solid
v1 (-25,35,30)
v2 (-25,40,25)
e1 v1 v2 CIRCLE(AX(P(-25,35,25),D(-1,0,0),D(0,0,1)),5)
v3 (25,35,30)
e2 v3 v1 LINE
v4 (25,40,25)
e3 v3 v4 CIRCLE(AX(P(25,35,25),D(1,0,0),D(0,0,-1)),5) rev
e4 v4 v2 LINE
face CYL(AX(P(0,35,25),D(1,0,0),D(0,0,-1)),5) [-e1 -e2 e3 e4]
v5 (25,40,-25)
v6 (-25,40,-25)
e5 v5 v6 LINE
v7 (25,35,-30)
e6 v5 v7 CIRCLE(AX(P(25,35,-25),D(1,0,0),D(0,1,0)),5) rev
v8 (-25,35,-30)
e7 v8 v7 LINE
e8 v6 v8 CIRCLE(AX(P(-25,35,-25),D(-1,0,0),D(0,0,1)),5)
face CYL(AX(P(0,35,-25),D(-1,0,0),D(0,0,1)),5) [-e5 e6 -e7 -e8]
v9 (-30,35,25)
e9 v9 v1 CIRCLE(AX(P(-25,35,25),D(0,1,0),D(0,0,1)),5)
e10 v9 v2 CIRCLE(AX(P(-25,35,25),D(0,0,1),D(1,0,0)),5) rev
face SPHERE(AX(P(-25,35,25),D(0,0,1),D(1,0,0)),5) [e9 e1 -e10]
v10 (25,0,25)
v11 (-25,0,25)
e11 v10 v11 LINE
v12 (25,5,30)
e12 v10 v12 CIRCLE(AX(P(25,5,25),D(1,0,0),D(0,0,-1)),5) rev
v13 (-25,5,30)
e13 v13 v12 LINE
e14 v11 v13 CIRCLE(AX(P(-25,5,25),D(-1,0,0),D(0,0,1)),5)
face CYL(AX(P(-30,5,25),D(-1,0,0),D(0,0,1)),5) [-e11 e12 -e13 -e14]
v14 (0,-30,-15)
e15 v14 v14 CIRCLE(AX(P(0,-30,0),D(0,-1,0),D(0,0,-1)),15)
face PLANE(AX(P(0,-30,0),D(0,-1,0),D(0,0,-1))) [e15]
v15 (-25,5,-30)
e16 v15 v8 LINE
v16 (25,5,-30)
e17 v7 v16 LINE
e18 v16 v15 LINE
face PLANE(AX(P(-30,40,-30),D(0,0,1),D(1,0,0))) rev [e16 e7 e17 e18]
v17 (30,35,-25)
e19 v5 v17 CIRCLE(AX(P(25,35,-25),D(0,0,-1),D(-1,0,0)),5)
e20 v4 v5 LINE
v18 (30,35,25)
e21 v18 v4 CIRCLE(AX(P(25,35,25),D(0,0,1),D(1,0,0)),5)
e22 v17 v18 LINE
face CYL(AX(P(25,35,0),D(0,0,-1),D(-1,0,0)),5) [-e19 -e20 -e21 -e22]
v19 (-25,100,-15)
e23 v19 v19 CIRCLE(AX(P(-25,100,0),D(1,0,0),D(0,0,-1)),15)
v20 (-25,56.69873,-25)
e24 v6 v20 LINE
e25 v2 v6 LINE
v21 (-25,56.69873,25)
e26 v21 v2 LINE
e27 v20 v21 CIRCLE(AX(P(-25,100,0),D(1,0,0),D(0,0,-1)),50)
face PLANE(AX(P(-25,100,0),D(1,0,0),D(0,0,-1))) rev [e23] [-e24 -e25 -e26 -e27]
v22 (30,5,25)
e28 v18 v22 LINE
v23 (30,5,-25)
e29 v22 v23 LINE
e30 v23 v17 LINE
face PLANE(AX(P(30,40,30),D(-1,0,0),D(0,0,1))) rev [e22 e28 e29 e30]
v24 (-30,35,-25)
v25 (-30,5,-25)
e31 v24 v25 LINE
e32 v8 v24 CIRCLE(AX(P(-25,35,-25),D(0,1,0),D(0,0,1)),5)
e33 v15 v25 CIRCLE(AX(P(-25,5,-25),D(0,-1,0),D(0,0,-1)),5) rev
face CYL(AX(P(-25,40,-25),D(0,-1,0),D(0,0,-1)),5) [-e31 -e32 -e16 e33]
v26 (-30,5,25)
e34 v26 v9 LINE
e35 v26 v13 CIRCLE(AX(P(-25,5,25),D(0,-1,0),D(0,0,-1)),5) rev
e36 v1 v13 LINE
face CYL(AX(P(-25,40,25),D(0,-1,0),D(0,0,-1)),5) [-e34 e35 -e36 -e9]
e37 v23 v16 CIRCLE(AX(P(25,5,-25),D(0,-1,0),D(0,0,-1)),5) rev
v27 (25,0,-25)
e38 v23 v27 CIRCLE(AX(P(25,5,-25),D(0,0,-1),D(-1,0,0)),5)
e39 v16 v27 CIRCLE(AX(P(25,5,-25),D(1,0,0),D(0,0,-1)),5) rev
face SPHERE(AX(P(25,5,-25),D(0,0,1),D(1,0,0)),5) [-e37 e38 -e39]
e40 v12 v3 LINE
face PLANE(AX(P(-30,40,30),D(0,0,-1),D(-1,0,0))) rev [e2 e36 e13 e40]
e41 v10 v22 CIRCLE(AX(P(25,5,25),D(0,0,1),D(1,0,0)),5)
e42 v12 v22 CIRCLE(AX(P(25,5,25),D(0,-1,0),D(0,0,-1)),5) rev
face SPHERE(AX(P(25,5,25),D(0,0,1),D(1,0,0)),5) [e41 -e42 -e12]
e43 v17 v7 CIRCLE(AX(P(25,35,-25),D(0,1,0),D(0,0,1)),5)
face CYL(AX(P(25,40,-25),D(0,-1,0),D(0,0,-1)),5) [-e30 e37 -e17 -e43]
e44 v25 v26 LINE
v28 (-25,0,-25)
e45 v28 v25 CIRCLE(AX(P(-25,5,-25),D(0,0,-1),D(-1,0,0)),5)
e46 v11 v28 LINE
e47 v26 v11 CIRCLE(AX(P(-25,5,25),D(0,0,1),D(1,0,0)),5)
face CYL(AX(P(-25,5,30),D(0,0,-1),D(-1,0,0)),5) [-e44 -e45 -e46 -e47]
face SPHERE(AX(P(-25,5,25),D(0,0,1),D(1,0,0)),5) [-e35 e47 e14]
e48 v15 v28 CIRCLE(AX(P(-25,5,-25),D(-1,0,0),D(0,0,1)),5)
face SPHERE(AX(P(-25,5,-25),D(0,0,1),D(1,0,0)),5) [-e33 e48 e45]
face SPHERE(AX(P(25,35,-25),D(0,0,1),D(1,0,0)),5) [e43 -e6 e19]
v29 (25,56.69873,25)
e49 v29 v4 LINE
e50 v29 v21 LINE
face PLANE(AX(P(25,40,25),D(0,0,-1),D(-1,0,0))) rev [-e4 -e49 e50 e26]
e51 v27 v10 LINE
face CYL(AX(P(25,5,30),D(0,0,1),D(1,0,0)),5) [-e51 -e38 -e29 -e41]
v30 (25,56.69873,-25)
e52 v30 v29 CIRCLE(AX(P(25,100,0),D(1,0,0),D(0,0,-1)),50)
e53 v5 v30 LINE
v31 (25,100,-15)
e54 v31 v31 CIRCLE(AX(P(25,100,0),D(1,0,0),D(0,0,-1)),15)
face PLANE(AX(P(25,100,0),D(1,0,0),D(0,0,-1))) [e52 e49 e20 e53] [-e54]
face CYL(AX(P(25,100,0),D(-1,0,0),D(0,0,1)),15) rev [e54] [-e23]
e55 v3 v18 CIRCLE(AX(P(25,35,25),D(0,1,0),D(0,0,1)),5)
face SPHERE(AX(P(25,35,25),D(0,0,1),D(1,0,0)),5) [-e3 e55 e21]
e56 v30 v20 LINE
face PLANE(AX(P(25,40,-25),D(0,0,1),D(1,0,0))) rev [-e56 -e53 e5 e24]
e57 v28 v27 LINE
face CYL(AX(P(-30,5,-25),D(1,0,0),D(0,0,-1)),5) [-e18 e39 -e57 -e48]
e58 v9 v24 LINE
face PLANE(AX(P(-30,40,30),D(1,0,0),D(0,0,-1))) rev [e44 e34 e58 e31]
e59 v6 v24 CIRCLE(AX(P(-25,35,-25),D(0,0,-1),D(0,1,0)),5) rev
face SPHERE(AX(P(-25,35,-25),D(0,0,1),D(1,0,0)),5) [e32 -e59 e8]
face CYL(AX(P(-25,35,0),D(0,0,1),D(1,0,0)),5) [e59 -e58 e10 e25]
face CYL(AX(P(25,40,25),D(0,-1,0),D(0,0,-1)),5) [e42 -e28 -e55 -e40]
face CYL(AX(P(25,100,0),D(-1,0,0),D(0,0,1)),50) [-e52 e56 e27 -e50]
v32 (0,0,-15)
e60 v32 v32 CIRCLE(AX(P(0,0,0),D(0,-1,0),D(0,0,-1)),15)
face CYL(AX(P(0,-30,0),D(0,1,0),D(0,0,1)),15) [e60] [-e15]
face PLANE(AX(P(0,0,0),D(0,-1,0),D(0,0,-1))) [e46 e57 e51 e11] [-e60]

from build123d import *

# Parameters (mm, degrees)
SKETCH_1_W      = 60
SKETCH_1_H      = 60
EXTRUDE_1_DEPTH = 40
SKETCH_2_R      = 15
EXTRUDE_2_DEPTH = 30
SKETCH_3_R      = 15
EXTRUDE_3_DEPTH = 25
FILLET_11_R     = 5


with BuildPart() as part:
    # 草圖1 → 填料-伸長1 (new body)
    with BuildSketch(Plane(origin=(0, 0, 0), x_dir=(1, 0, 0), z_dir=(0, 1, 0))):
        Rectangle(SKETCH_1_W, SKETCH_1_H)
    extrude(amount=EXTRUDE_1_DEPTH)

    # 草圖2 → 填料-伸長2 (add)
    with BuildSketch(Plane.XZ):
        with Locations(Location((0, 0, 0), (0, 0, 270))):
            Circle(SKETCH_2_R)
    extrude(amount=EXTRUDE_2_DEPTH)

    # 草圖3 → 填料-伸長3 (add, symmetric)
    with BuildSketch(Plane(origin=(0, 0, 0), x_dir=(0, 0, -1), z_dir=(1, 0, 0))):
        with BuildLine():
            Line((-25, 40), (25, 40))
            Line((25, 40), (25, 56.698729811))
            ThreePointArc((25, 56.698729811), (0, 150), (-25, 56.698729811))
            Line((-25, 56.698729811), (-25, 40))
        make_face()
        with Locations((0, 100)):
            Circle(SKETCH_3_R, mode=Mode.SUBTRACT)
    extrude(amount=EXTRUDE_3_DEPTH, both=True)

    # 圓角11
    fillet_11_edges = [part.edges().sort_by_distance(p)[0] for p in [
        (-30, 40, 0),
        (0, 40, 30),
        (30, 40, 0),
        (0, 0, 30),
        (-30, 0, 0),
        (0, 0, -30),
        (30, 0, 0),
        (0, 40, -30),
        (30, 20, 30),
        (-30, 20, 30),
        (-30, 20, -30),
        (30, 20, -30),
    ]]
    fillet(fillet_11_edges, radius=FILLET_11_R - 0.0001)  # a hair under: the kernel refuses the full size


solid = part.part
